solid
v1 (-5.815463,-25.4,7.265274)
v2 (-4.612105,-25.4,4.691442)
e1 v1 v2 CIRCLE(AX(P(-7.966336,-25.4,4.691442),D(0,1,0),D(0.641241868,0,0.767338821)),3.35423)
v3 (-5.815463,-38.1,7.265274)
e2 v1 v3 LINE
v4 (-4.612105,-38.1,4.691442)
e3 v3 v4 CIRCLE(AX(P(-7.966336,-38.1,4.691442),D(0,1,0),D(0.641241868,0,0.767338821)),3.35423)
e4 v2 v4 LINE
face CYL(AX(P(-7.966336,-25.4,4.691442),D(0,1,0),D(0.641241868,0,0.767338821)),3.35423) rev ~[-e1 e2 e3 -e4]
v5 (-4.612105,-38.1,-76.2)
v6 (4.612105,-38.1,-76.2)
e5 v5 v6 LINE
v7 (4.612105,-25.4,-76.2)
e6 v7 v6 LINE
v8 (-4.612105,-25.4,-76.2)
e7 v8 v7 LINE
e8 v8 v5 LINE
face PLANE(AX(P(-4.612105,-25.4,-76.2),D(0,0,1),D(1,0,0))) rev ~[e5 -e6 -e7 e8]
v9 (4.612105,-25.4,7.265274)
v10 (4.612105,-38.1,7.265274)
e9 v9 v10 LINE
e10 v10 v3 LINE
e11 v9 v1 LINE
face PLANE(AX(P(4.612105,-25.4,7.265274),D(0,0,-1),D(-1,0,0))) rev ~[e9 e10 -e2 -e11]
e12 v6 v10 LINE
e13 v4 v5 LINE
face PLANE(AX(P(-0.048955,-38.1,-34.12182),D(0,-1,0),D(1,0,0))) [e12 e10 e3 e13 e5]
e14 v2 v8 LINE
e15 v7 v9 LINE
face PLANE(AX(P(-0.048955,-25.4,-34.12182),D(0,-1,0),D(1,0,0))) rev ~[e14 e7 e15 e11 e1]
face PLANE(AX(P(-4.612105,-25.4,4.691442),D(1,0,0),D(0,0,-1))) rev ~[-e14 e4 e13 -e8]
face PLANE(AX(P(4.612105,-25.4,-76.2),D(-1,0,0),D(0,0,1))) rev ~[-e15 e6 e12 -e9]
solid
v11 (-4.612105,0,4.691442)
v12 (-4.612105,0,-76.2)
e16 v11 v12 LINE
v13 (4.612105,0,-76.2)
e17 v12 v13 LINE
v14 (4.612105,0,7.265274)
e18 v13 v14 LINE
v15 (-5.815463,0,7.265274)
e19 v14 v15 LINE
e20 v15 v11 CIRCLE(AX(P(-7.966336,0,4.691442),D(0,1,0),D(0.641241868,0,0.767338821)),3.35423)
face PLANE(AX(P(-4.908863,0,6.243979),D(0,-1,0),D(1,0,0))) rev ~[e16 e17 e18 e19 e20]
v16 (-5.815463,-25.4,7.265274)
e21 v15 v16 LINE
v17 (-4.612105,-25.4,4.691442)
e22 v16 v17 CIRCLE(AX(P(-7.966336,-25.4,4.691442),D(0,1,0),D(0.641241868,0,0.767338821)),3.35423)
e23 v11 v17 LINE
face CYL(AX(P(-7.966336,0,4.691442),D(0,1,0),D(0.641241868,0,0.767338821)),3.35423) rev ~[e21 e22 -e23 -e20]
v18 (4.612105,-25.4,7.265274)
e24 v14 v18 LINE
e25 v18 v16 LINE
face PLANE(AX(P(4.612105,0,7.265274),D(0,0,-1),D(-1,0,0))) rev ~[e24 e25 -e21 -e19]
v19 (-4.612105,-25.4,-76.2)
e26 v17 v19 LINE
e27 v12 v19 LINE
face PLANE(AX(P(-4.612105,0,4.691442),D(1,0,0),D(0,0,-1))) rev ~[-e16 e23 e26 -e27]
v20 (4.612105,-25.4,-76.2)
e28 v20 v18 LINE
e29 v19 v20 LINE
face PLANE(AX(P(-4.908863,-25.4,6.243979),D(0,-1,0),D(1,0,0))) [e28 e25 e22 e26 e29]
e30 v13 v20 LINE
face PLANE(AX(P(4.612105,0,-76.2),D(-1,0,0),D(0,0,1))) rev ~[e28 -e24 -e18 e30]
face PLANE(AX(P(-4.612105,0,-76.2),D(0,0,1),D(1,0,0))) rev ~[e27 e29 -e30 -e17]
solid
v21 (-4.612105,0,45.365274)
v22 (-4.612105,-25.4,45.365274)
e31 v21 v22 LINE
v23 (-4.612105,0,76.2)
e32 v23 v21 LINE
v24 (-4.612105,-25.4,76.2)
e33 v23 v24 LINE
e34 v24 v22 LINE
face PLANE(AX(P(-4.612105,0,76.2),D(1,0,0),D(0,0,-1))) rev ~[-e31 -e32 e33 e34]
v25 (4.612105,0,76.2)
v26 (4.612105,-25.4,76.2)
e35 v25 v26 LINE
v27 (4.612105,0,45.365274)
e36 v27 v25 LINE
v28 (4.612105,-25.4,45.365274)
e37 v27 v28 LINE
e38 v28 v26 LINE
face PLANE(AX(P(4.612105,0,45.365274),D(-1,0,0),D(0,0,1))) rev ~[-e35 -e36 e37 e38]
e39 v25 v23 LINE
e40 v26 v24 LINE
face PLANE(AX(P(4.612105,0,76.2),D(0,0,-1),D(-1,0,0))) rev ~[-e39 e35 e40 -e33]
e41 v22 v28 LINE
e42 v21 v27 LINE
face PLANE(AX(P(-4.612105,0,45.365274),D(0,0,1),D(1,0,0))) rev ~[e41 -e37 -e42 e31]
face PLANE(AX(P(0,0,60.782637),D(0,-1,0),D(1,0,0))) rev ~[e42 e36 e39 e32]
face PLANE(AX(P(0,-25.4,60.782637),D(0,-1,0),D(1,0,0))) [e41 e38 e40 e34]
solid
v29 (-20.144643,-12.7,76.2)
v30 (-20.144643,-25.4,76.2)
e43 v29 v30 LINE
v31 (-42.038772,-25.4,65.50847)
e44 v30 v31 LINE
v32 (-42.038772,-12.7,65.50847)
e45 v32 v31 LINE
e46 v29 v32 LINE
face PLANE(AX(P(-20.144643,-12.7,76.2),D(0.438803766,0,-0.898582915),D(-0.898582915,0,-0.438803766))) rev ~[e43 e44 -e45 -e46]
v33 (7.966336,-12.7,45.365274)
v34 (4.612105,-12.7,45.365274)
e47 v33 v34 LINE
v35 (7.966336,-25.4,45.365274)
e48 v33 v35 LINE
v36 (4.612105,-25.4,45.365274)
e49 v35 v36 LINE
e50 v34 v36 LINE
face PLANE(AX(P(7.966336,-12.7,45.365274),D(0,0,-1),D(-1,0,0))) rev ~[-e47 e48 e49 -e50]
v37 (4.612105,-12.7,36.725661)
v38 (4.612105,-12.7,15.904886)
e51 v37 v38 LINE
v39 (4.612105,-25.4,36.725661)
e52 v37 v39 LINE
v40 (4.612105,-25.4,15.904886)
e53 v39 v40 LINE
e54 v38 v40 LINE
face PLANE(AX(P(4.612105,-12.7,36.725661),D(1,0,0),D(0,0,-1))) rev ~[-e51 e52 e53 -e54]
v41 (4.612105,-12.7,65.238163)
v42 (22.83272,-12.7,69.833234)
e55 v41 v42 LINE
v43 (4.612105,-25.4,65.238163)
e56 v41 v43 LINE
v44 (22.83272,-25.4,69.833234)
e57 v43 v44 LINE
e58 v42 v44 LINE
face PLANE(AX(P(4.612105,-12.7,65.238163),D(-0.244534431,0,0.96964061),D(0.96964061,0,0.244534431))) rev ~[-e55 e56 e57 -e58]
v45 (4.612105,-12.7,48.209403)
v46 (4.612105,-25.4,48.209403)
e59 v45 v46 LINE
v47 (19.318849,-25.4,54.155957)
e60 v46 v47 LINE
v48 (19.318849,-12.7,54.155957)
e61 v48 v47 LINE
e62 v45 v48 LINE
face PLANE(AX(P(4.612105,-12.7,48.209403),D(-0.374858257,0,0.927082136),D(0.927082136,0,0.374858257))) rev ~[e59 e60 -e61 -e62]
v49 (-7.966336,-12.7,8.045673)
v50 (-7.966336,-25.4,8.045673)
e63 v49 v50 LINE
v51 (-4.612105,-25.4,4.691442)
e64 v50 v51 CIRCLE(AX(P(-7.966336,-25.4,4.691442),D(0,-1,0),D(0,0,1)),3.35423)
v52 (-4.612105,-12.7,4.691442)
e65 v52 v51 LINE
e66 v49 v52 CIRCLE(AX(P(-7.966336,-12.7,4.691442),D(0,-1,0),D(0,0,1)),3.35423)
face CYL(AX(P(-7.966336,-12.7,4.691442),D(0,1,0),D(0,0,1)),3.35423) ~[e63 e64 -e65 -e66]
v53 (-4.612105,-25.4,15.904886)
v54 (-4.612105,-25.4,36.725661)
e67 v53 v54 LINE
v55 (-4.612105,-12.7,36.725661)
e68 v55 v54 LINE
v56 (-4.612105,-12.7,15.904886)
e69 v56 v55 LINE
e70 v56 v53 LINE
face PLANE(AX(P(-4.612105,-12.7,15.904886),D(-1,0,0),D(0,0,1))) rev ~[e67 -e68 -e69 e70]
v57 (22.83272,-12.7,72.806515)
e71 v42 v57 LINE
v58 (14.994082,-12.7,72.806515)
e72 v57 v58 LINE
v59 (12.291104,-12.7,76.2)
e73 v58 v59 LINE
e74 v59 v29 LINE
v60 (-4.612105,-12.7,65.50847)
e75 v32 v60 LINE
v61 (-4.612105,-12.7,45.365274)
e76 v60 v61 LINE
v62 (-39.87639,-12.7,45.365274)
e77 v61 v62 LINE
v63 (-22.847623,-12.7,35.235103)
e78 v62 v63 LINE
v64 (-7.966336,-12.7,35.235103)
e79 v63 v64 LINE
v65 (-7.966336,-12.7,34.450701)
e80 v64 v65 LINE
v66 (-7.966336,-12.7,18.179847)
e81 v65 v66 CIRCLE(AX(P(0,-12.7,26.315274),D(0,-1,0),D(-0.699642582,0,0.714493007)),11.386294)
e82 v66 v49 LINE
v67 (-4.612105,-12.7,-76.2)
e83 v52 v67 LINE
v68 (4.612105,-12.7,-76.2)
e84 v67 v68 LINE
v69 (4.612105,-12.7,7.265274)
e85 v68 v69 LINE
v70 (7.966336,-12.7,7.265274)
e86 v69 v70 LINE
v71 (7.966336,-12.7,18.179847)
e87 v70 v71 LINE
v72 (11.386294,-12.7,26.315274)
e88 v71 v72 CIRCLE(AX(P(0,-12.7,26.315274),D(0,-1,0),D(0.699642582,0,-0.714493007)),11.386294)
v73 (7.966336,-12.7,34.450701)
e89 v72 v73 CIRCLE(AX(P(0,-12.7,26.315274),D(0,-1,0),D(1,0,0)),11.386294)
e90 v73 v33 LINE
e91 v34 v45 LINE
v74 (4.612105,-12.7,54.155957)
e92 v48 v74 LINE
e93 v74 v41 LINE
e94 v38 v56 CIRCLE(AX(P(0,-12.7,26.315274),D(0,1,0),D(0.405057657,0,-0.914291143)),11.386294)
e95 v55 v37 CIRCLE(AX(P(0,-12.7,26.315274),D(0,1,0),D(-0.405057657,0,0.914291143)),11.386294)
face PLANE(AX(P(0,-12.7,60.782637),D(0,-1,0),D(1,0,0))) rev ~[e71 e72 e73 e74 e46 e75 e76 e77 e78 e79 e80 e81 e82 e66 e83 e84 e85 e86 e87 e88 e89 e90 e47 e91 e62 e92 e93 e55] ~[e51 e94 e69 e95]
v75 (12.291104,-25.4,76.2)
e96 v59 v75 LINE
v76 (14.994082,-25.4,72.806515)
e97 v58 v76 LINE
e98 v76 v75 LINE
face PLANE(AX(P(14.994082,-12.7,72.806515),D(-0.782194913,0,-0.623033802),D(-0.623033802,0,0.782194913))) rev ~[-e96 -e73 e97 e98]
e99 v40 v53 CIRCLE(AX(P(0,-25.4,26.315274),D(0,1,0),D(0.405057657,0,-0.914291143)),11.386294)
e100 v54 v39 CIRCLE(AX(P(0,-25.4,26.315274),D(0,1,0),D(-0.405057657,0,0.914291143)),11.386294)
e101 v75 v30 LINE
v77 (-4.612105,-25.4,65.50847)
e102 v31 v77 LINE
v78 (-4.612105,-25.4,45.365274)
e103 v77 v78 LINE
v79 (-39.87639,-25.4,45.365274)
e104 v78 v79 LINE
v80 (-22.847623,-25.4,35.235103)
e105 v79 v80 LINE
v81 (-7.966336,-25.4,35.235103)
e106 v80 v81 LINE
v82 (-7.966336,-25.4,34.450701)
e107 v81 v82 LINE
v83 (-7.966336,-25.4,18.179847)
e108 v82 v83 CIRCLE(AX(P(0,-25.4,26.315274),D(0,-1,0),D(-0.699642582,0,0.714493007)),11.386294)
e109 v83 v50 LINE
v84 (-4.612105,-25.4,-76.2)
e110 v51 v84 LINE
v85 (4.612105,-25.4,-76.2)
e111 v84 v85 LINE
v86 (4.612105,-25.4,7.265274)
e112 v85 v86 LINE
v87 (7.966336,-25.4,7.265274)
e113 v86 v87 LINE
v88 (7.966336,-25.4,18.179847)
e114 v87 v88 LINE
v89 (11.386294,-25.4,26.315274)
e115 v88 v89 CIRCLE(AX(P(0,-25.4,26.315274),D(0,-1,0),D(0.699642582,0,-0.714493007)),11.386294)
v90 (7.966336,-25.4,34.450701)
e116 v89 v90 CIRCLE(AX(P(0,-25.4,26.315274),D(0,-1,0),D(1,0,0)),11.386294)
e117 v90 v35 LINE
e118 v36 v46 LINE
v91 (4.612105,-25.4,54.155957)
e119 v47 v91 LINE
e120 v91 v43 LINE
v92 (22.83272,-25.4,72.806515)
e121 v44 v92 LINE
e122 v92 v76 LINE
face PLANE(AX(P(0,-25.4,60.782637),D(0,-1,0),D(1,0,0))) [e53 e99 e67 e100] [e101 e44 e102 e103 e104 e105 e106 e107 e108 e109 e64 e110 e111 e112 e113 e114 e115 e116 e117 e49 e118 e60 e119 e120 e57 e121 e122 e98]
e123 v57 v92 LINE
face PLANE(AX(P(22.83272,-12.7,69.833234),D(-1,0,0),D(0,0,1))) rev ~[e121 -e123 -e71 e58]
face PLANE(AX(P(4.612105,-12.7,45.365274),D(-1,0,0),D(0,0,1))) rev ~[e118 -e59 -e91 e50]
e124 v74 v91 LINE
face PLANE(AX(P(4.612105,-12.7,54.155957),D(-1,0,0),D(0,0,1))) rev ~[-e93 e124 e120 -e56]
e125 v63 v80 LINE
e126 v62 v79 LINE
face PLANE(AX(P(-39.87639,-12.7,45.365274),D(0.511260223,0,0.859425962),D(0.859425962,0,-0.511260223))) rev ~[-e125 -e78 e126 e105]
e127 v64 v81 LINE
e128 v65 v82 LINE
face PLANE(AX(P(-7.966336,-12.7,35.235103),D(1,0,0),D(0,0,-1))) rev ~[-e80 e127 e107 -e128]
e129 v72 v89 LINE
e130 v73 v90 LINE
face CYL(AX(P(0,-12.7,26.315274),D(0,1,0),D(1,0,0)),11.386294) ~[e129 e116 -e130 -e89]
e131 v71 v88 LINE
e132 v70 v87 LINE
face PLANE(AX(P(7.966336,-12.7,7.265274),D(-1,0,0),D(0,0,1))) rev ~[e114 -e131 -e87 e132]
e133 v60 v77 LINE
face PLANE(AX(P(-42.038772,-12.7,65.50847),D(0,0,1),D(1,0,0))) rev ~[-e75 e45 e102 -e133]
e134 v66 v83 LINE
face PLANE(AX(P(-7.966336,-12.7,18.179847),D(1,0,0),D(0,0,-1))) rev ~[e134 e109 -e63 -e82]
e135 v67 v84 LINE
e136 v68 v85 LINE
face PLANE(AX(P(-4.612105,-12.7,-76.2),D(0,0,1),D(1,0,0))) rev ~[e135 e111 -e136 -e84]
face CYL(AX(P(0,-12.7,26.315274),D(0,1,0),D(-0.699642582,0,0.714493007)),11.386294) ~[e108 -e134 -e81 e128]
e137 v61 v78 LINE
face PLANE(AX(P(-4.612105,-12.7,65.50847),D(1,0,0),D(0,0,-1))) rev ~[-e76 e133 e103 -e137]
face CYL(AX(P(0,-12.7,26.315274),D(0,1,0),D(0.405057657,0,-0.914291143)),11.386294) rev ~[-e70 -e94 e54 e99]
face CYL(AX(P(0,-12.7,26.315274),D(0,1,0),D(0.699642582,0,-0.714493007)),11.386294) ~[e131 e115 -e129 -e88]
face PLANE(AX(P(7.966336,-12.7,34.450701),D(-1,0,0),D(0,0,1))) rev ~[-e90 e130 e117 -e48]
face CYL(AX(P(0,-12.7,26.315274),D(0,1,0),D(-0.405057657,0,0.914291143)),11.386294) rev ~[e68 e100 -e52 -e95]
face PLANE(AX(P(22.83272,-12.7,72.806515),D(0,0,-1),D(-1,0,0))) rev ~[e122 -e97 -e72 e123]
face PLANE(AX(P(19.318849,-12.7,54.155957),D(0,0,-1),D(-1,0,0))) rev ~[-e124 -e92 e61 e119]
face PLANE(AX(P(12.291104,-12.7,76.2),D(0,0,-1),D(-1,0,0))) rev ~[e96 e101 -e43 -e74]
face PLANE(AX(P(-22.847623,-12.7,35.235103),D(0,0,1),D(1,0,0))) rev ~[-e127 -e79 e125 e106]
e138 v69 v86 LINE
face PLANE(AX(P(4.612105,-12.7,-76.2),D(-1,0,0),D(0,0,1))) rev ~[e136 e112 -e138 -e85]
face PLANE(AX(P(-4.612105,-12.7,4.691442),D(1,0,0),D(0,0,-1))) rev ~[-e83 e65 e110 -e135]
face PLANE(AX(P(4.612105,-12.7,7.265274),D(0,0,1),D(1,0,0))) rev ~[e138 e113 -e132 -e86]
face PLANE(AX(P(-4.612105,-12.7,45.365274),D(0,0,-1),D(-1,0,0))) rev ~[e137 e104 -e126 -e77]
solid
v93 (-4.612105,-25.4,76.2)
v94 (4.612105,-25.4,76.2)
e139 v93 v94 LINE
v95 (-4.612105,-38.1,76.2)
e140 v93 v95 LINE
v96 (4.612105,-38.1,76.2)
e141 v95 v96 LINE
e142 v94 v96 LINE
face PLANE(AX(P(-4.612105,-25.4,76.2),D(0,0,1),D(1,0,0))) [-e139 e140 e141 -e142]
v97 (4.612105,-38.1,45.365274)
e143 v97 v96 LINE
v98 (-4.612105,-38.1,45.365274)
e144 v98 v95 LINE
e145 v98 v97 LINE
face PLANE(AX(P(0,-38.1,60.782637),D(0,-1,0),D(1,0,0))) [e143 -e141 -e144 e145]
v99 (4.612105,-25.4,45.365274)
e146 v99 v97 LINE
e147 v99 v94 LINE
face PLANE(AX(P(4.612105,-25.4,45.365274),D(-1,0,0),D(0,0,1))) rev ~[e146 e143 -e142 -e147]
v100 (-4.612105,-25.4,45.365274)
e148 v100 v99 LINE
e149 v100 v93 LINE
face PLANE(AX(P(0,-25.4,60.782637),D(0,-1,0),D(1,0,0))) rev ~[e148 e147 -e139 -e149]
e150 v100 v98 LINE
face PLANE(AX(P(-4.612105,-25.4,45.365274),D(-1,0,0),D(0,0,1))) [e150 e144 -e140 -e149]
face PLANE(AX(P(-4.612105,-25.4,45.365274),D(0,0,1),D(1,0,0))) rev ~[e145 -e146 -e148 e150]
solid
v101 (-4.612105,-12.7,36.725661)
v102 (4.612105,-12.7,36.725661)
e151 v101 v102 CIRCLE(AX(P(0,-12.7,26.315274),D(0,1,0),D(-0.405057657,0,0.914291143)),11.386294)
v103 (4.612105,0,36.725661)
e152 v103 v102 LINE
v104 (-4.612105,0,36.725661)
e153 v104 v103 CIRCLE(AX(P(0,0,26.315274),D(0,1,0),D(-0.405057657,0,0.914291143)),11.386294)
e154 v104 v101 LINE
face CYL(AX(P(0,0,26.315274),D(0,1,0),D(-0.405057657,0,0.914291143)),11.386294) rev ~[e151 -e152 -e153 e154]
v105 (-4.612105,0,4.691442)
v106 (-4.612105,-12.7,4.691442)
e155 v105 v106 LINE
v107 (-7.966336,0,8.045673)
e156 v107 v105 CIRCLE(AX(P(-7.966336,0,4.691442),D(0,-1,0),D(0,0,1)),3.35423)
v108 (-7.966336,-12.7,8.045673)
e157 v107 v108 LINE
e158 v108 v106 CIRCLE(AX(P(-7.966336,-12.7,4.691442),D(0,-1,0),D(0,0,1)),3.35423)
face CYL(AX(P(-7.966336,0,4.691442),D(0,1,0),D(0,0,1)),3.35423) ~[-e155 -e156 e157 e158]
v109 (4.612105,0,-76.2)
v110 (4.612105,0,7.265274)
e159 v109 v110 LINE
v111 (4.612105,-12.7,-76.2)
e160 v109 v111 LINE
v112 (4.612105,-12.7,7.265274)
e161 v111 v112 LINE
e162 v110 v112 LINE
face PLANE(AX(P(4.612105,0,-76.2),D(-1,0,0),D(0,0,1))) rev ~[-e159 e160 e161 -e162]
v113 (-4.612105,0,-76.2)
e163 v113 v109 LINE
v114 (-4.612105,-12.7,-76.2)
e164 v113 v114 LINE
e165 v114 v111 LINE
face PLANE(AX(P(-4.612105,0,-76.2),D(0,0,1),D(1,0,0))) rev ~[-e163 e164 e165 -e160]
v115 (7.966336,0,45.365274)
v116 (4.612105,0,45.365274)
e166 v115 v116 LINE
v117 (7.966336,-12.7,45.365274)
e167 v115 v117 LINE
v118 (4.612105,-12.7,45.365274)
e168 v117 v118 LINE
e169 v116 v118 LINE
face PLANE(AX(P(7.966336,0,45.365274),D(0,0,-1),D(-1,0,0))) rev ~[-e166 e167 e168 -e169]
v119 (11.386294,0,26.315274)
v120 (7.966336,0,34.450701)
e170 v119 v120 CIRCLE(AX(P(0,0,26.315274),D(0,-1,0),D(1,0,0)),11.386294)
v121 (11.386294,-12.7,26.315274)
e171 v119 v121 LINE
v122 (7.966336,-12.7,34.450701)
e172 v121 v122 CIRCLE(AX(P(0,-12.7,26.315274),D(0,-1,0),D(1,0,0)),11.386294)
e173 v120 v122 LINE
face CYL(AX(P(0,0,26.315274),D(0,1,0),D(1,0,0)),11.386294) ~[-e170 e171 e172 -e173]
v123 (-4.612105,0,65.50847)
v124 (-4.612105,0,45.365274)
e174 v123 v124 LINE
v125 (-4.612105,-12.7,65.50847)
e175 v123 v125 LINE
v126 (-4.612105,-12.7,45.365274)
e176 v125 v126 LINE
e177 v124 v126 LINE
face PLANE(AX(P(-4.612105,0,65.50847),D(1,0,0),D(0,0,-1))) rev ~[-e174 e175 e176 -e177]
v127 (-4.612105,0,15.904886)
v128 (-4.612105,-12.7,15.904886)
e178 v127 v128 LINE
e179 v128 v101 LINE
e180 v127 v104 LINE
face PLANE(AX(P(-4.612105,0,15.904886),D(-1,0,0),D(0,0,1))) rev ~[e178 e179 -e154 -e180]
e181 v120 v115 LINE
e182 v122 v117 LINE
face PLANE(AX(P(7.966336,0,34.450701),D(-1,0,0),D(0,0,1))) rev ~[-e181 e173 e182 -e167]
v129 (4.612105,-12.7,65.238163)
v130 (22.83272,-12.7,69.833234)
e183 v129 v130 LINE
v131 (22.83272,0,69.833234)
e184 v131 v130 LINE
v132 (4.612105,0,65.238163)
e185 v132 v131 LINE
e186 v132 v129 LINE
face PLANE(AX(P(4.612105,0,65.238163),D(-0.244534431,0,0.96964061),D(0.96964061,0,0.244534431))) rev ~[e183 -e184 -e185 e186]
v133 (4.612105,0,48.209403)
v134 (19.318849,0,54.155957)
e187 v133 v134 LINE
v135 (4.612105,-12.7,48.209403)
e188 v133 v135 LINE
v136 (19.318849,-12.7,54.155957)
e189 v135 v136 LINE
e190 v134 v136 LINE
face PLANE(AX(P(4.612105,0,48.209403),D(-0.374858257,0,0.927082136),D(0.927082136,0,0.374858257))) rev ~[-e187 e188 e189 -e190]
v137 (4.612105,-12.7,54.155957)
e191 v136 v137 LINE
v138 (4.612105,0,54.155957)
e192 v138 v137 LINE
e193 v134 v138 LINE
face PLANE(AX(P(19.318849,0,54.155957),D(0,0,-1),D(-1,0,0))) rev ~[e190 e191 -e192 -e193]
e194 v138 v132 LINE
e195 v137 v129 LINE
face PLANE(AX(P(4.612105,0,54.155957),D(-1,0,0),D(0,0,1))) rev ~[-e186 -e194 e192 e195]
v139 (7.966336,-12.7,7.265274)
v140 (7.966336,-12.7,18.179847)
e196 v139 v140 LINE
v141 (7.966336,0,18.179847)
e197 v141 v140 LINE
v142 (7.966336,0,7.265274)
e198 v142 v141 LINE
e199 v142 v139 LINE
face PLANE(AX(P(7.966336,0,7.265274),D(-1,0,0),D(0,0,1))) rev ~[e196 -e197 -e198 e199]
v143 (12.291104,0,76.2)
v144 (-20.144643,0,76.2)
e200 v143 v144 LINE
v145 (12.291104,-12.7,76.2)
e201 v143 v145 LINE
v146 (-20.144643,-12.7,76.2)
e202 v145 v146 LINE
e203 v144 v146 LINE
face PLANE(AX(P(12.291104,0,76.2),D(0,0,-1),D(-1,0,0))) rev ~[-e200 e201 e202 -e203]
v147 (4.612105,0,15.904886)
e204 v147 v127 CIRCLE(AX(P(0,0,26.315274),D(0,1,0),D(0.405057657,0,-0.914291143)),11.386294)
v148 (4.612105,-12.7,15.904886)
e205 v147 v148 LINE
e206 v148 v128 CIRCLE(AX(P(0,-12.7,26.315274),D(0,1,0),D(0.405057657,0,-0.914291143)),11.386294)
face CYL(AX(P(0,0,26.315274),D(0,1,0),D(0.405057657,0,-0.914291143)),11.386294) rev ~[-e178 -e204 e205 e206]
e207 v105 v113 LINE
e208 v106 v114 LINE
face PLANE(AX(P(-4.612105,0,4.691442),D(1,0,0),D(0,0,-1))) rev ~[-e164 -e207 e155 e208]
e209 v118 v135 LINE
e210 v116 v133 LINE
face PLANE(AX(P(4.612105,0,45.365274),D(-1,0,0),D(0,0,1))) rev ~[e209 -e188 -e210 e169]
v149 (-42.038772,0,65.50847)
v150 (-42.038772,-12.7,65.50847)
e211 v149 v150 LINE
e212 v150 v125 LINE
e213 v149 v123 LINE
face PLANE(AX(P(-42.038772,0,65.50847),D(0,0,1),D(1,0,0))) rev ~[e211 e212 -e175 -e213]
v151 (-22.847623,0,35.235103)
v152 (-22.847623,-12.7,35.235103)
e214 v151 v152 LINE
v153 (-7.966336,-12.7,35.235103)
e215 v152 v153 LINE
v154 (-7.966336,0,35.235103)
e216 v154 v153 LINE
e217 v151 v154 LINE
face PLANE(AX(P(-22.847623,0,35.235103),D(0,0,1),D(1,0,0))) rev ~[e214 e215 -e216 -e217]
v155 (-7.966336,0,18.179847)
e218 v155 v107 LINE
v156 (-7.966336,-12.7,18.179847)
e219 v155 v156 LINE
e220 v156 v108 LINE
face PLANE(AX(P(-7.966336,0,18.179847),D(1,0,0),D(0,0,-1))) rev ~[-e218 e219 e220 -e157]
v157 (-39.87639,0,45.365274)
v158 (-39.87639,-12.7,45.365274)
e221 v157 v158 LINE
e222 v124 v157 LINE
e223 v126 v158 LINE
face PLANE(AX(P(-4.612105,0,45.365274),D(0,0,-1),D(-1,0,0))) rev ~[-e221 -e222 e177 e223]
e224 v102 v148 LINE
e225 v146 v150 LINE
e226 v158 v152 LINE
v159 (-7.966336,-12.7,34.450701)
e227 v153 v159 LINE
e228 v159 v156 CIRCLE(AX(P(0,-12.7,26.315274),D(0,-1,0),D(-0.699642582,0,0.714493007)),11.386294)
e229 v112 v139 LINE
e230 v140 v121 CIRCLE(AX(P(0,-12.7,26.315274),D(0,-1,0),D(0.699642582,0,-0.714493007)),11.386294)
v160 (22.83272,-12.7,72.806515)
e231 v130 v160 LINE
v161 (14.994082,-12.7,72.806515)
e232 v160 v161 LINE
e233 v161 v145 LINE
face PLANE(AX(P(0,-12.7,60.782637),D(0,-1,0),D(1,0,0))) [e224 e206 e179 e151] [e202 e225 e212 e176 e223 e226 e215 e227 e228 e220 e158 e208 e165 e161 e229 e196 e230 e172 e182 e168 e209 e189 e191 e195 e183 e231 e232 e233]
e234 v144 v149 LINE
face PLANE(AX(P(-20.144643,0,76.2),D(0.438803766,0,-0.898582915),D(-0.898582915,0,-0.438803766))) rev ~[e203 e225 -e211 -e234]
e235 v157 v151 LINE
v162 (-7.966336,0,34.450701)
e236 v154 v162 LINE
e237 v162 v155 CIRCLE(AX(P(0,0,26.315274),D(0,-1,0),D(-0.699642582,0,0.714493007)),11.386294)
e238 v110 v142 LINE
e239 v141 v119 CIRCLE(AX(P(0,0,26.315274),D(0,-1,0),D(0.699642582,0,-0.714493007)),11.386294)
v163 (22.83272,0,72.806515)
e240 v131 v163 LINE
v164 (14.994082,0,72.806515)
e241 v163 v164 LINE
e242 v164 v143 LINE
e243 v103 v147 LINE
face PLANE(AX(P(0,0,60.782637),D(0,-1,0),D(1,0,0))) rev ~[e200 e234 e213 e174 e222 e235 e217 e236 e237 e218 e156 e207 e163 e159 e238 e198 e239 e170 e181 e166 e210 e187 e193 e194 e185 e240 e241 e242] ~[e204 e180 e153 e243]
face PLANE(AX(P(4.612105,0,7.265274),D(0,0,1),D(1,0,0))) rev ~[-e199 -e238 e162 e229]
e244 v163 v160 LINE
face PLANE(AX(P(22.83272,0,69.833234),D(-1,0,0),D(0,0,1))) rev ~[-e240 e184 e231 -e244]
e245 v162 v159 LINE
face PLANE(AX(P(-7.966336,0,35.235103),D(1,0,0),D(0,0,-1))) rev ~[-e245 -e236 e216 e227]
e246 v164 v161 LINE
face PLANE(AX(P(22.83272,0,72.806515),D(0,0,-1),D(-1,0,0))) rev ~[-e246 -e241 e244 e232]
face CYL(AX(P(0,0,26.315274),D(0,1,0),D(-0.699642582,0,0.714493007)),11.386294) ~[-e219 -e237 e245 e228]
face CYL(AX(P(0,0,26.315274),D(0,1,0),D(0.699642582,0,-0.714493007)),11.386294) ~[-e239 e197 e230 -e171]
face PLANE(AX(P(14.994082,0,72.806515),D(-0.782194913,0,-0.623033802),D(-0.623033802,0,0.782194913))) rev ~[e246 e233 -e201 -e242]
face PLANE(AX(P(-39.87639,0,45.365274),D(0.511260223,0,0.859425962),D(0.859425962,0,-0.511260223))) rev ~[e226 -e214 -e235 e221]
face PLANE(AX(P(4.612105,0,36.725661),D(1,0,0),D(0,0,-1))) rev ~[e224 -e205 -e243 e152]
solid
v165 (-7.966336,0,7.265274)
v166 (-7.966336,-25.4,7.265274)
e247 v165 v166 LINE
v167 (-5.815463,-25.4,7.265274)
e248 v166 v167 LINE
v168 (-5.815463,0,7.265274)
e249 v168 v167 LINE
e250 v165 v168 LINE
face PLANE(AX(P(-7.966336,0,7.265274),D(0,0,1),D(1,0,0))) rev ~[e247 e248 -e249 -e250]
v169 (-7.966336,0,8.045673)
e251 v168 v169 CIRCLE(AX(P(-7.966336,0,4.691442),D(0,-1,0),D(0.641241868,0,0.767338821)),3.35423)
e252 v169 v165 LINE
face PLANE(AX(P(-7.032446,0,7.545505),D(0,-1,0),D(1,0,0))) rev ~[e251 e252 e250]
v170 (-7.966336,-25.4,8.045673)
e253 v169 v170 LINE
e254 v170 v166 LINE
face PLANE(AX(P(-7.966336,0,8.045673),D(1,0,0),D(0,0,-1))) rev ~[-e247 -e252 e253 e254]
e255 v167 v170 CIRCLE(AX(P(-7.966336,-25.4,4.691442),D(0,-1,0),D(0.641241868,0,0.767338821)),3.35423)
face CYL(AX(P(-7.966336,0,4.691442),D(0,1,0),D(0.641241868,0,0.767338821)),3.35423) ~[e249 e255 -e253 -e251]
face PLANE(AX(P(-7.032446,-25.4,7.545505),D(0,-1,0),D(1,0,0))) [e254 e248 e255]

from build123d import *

# Parameters (mm, degrees)
F1_DEPTH  = 25.4
F1_FACE_W = 9.2242108179
F1_FACE_H = 30.834726283
F2_DEPTH  = 12.7
F3_DEPTH  = 12.7


with BuildPart() as f1:
    # F0 (on Front) → F1 (new body)
    with BuildSketch(Plane.XZ):
        with BuildLine():
            Line((-7.9663358629, 7.265273717), (-5.8154628601, 7.265273717))
            ThreePointArc((-5.8154628601, 7.265273717), (-6.822299412, 7.8445429389), (-7.9663358629, 8.0456729287))
            Line((-7.9663358629, 8.0456729287), (-7.9663358629, 7.265273717))
        make_face()
    extrude(amount=F1_DEPTH)


with BuildPart() as f1b:
    # F0 (on Front) → F1, piece 2 (new body)
    with BuildSketch(Plane.XZ):
        with BuildLine():
            Line((-4.6121054089, 4.6914424747), (-4.6121054089, 7.265273717))
            Line((-4.6121054089, 7.265273717), (-5.8154628601, 7.265273717))
            ThreePointArc((-5.8154628601, 7.265273717), (-4.9278012106, 6.1120652624), (-4.6121054089, 4.6914424747))
        make_face()
        Polygon((4.6121054089, 7.265273717), (-4.6121054089, 7.265273717), (-4.6121054089, 4.6914424747), (-4.6121054089, -76.2), (4.6121054089, -76.2), align=None)
    extrude(amount=F1_DEPTH)


with BuildPart() as f1c:
    # F0 (on Front) → F1, piece 3 (new body)
    with BuildSketch(Plane.XZ):
        Polygon((4.6121054089, 65.2381628752), (4.6121054089, 76.2), (-4.6121054089, 76.2), (-4.6121054089, 65.5084699392), (-4.6121054089, 45.365273717), (4.6121054089, 45.365273717), (4.6121054089, 48.2094027102), (4.6121054089, 54.1559569538), align=None)
    extrude(amount=F1_DEPTH)


with BuildPart() as f2:
    # F0 (on Front) + F1_face (on face) → F2 (new body)
    with BuildSketch(Plane.XZ):
        Polygon((4.6121054089, 65.2381628752), (4.6121054089, 76.2), (-4.6121054089, 76.2), (-4.6121054089, 65.5084699392), (-4.6121054089, 45.365273717), (4.6121054089, 45.365273717), (4.6121054089, 48.2094027102), (4.6121054089, 54.1559569538), align=None)
        Polygon((12.2911036015, 76.2), (4.6121054089, 76.2), (4.6121054089, 65.2381628752), (22.8327196091, 69.8332339525), (22.8327196091, 72.8065147996), (17.9673600942, 72.8065147996), (14.9940820411, 72.8065147996), align=None)
        Polygon((-4.6121054089, 65.5084699392), (-4.6121054089, 76.2), (-20.144643262, 76.2), (-42.0387722552, 65.5084699392), align=None)
        Polygon((19.3188488483, 54.1559569538), (4.6121054089, 54.1559569538), (4.6121054089, 48.2094027102), align=None)
        with BuildLine():
            Line((4.6121054089, 45.365273717), (-4.6121054089, 45.365273717))
            Line((-4.6121054089, 45.365273717), (-4.6121054089, 36.7256611241))
            ThreePointArc((-4.6121054089, 36.7256611241), (0, 37.7015673313), (4.6121054089, 36.7256611241))
            Line((4.6121054089, 36.7256611241), (4.6121054089, 45.365273717))
        make_face()
        with BuildLine():
            Line((-4.6121054089, 36.7256611241), (-4.6121054089, 45.365273717))
            Line((-4.6121054089, 45.365273717), (-7.9663358629, 45.365273717))
            Line((-7.9663358629, 45.365273717), (-7.9663358629, 35.2351032197))
            Line((-7.9663358629, 35.2351032197), (-7.9663358629, 34.450700884))
            ThreePointArc((-7.9663358629, 34.450700884), (-6.3912563108, 35.7386237073), (-4.6121054089, 36.7256611241))
        make_face()
        with BuildLine():
            Line((-4.6121054089, 15.90488631), (-4.6121054089, 36.7256611241))
            ThreePointArc((-4.6121054089, 36.7256611241), (-6.3912563108, 35.7386237073), (-7.9663358629, 34.450700884))
            Line((-7.9663358629, 34.450700884), (-7.9663358629, 18.1798465501))
            ThreePointArc((-7.9663358629, 18.1798465501), (-6.3912563108, 16.8919237268), (-4.6121054089, 15.90488631))
        make_face()
        with BuildLine():
            Line((7.9663358629, 45.365273717), (4.6121054089, 45.365273717))
            Line((4.6121054089, 45.365273717), (4.6121054089, 36.7256611241))
            ThreePointArc((4.6121054089, 36.7256611241), (6.3912563108, 35.7386237073), (7.9663358629, 34.450700884))
            Line((7.9663358629, 34.450700884), (7.9663358629, 45.365273717))
        make_face()
        Polygon((-7.9663358629, 35.2351032197), (-7.9663358629, 45.365273717), (-39.8763902485, 45.365273717), (-22.847622633, 35.2351032197), align=None)
        with BuildLine():
            ThreePointArc((4.6121054089, 15.90488631), (0, 14.9289801028), (-4.6121054089, 15.90488631))
            Line((-4.6121054089, 15.90488631), (-4.6121054089, 7.265273717))
            Line((-4.6121054089, 7.265273717), (4.6121054089, 7.265273717))
            Line((4.6121054089, 7.265273717), (4.6121054089, 15.90488631))
        make_face()
        with BuildLine():
            Line((-4.6121054089, 7.265273717), (-4.6121054089, 15.90488631))
            ThreePointArc((-4.6121054089, 15.90488631), (-6.3912563108, 16.8919237268), (-7.9663358629, 18.1798465501))
            Line((-7.9663358629, 18.1798465501), (-7.9663358629, 8.0456729287))
            ThreePointArc((-7.9663358629, 8.0456729287), (-6.822299412, 7.8445429389), (-5.8154628601, 7.265273717))
            Line((-5.8154628601, 7.265273717), (-4.6121054089, 7.265273717))
        make_face()
        with BuildLine():
            ThreePointArc((7.9663358629, 34.450700884), (6.3912563108, 35.7386237073), (4.6121054089, 36.7256611241))
            Line((4.6121054089, 36.7256611241), (4.6121054089, 15.90488631))
            ThreePointArc((4.6121054089, 15.90488631), (6.3912563108, 16.8919237268), (7.9663358629, 18.1798465501))
            Line((7.9663358629, 18.1798465501), (7.9663358629, 34.450700884))
        make_face()
        with BuildLine():
            Line((-7.9663358629, 18.1798465501), (-7.9663358629, 34.450700884))
            ThreePointArc((-7.9663358629, 34.450700884), (-11.3862936142, 26.315273717), (-7.9663358629, 18.1798465501))
        make_face()
        Polygon((4.6121054089, 7.265273717), (-4.6121054089, 7.265273717), (-4.6121054089, 4.6914424747), (-4.6121054089, -76.2), (4.6121054089, -76.2), align=None)
        with BuildLine():
            Line((-4.6121054089, 4.6914424747), (-4.6121054089, 7.265273717))
            Line((-4.6121054089, 7.265273717), (-5.8154628601, 7.265273717))
            ThreePointArc((-5.8154628601, 7.265273717), (-4.9278012106, 6.1120652624), (-4.6121054089, 4.6914424747))
        make_face()
        with BuildLine():
            ThreePointArc((7.9663358629, 18.1798465501), (6.3912563108, 16.8919237268), (4.6121054089, 15.90488631))
            Line((4.6121054089, 15.90488631), (4.6121054089, 7.265273717))
            Line((4.6121054089, 7.265273717), (7.9663358629, 7.265273717))
            Line((7.9663358629, 7.265273717), (7.9663358629, 18.1798465501))
        make_face()
        with BuildLine():
            ThreePointArc((11.3862936142, 26.315273717), (10.4965404166, 30.7277924482), (7.9663358629, 34.450700884))
            Line((7.9663358629, 34.450700884), (7.9663358629, 18.1798465501))
            ThreePointArc((7.9663358629, 18.1798465501), (10.4965404166, 21.9027549859), (11.3862936142, 26.315273717))
        make_face()
        with BuildLine():
            ThreePointArc((-7.9663358629, 8.0456729287), (-10.3381349625, 2.3196433751), (-4.6121054089, 4.6914424747))
            ThreePointArc((-4.6121054089, 4.6914424747), (-4.9278012106, 6.1120652624), (-5.8154628601, 7.265273717))
            Line((-5.8154628601, 7.265273717), (-7.9663358629, 7.265273717))
            Line((-7.9663358629, 7.265273717), (-7.9663358629, 8.0456729287))
        make_face()
        with BuildLine():
            Line((-7.9663358629, 7.265273717), (-5.8154628601, 7.265273717))
            ThreePointArc((-5.8154628601, 7.265273717), (-6.822299412, 7.8445429389), (-7.9663358629, 8.0456729287))
            Line((-7.9663358629, 8.0456729287), (-7.9663358629, 7.265273717))
        make_face()
    with BuildSketch(Plane(origin=(-0.00607725, -25.4, -34.4169717723), x_dir=(1, 0, 0), z_dir=(0, -1, 0))):
        with BuildLine():
            ThreePointArc((-5.8093856101, 41.6822454894), (-4.9217239606, 40.5290370347), (-4.606028159, 39.1084142471))
            Line((-4.606028159, 39.1084142471), (-4.606028159, -41.7830282277))
            Line((-4.606028159, -41.7830282277), (4.6181826589, -41.7830282277))
            Line((4.6181826589, -41.7830282277), (4.6181826589, 41.6822454894))
            Line((4.6181826589, 41.6822454894), (-5.8093856101, 41.6822454894))
        make_face()
        with Locations((0.00607725, 95.1996086309)):
            Rectangle(F1_FACE_W, F1_FACE_H)
    extrude(amount=F2_DEPTH)


with BuildPart() as f3:
    # F3 (new): a face of the model
    f3_faces = [f2.part.faces().sort_by_distance(p)[0] for p in [
        (-6.3100125111, -12.7, 13.1127597394),
    ]]
    extrude(f3_faces, amount=F3_DEPTH)


solid = Compound([f1.part, f1b.part, f1c.part, f2.part, f3.part])
